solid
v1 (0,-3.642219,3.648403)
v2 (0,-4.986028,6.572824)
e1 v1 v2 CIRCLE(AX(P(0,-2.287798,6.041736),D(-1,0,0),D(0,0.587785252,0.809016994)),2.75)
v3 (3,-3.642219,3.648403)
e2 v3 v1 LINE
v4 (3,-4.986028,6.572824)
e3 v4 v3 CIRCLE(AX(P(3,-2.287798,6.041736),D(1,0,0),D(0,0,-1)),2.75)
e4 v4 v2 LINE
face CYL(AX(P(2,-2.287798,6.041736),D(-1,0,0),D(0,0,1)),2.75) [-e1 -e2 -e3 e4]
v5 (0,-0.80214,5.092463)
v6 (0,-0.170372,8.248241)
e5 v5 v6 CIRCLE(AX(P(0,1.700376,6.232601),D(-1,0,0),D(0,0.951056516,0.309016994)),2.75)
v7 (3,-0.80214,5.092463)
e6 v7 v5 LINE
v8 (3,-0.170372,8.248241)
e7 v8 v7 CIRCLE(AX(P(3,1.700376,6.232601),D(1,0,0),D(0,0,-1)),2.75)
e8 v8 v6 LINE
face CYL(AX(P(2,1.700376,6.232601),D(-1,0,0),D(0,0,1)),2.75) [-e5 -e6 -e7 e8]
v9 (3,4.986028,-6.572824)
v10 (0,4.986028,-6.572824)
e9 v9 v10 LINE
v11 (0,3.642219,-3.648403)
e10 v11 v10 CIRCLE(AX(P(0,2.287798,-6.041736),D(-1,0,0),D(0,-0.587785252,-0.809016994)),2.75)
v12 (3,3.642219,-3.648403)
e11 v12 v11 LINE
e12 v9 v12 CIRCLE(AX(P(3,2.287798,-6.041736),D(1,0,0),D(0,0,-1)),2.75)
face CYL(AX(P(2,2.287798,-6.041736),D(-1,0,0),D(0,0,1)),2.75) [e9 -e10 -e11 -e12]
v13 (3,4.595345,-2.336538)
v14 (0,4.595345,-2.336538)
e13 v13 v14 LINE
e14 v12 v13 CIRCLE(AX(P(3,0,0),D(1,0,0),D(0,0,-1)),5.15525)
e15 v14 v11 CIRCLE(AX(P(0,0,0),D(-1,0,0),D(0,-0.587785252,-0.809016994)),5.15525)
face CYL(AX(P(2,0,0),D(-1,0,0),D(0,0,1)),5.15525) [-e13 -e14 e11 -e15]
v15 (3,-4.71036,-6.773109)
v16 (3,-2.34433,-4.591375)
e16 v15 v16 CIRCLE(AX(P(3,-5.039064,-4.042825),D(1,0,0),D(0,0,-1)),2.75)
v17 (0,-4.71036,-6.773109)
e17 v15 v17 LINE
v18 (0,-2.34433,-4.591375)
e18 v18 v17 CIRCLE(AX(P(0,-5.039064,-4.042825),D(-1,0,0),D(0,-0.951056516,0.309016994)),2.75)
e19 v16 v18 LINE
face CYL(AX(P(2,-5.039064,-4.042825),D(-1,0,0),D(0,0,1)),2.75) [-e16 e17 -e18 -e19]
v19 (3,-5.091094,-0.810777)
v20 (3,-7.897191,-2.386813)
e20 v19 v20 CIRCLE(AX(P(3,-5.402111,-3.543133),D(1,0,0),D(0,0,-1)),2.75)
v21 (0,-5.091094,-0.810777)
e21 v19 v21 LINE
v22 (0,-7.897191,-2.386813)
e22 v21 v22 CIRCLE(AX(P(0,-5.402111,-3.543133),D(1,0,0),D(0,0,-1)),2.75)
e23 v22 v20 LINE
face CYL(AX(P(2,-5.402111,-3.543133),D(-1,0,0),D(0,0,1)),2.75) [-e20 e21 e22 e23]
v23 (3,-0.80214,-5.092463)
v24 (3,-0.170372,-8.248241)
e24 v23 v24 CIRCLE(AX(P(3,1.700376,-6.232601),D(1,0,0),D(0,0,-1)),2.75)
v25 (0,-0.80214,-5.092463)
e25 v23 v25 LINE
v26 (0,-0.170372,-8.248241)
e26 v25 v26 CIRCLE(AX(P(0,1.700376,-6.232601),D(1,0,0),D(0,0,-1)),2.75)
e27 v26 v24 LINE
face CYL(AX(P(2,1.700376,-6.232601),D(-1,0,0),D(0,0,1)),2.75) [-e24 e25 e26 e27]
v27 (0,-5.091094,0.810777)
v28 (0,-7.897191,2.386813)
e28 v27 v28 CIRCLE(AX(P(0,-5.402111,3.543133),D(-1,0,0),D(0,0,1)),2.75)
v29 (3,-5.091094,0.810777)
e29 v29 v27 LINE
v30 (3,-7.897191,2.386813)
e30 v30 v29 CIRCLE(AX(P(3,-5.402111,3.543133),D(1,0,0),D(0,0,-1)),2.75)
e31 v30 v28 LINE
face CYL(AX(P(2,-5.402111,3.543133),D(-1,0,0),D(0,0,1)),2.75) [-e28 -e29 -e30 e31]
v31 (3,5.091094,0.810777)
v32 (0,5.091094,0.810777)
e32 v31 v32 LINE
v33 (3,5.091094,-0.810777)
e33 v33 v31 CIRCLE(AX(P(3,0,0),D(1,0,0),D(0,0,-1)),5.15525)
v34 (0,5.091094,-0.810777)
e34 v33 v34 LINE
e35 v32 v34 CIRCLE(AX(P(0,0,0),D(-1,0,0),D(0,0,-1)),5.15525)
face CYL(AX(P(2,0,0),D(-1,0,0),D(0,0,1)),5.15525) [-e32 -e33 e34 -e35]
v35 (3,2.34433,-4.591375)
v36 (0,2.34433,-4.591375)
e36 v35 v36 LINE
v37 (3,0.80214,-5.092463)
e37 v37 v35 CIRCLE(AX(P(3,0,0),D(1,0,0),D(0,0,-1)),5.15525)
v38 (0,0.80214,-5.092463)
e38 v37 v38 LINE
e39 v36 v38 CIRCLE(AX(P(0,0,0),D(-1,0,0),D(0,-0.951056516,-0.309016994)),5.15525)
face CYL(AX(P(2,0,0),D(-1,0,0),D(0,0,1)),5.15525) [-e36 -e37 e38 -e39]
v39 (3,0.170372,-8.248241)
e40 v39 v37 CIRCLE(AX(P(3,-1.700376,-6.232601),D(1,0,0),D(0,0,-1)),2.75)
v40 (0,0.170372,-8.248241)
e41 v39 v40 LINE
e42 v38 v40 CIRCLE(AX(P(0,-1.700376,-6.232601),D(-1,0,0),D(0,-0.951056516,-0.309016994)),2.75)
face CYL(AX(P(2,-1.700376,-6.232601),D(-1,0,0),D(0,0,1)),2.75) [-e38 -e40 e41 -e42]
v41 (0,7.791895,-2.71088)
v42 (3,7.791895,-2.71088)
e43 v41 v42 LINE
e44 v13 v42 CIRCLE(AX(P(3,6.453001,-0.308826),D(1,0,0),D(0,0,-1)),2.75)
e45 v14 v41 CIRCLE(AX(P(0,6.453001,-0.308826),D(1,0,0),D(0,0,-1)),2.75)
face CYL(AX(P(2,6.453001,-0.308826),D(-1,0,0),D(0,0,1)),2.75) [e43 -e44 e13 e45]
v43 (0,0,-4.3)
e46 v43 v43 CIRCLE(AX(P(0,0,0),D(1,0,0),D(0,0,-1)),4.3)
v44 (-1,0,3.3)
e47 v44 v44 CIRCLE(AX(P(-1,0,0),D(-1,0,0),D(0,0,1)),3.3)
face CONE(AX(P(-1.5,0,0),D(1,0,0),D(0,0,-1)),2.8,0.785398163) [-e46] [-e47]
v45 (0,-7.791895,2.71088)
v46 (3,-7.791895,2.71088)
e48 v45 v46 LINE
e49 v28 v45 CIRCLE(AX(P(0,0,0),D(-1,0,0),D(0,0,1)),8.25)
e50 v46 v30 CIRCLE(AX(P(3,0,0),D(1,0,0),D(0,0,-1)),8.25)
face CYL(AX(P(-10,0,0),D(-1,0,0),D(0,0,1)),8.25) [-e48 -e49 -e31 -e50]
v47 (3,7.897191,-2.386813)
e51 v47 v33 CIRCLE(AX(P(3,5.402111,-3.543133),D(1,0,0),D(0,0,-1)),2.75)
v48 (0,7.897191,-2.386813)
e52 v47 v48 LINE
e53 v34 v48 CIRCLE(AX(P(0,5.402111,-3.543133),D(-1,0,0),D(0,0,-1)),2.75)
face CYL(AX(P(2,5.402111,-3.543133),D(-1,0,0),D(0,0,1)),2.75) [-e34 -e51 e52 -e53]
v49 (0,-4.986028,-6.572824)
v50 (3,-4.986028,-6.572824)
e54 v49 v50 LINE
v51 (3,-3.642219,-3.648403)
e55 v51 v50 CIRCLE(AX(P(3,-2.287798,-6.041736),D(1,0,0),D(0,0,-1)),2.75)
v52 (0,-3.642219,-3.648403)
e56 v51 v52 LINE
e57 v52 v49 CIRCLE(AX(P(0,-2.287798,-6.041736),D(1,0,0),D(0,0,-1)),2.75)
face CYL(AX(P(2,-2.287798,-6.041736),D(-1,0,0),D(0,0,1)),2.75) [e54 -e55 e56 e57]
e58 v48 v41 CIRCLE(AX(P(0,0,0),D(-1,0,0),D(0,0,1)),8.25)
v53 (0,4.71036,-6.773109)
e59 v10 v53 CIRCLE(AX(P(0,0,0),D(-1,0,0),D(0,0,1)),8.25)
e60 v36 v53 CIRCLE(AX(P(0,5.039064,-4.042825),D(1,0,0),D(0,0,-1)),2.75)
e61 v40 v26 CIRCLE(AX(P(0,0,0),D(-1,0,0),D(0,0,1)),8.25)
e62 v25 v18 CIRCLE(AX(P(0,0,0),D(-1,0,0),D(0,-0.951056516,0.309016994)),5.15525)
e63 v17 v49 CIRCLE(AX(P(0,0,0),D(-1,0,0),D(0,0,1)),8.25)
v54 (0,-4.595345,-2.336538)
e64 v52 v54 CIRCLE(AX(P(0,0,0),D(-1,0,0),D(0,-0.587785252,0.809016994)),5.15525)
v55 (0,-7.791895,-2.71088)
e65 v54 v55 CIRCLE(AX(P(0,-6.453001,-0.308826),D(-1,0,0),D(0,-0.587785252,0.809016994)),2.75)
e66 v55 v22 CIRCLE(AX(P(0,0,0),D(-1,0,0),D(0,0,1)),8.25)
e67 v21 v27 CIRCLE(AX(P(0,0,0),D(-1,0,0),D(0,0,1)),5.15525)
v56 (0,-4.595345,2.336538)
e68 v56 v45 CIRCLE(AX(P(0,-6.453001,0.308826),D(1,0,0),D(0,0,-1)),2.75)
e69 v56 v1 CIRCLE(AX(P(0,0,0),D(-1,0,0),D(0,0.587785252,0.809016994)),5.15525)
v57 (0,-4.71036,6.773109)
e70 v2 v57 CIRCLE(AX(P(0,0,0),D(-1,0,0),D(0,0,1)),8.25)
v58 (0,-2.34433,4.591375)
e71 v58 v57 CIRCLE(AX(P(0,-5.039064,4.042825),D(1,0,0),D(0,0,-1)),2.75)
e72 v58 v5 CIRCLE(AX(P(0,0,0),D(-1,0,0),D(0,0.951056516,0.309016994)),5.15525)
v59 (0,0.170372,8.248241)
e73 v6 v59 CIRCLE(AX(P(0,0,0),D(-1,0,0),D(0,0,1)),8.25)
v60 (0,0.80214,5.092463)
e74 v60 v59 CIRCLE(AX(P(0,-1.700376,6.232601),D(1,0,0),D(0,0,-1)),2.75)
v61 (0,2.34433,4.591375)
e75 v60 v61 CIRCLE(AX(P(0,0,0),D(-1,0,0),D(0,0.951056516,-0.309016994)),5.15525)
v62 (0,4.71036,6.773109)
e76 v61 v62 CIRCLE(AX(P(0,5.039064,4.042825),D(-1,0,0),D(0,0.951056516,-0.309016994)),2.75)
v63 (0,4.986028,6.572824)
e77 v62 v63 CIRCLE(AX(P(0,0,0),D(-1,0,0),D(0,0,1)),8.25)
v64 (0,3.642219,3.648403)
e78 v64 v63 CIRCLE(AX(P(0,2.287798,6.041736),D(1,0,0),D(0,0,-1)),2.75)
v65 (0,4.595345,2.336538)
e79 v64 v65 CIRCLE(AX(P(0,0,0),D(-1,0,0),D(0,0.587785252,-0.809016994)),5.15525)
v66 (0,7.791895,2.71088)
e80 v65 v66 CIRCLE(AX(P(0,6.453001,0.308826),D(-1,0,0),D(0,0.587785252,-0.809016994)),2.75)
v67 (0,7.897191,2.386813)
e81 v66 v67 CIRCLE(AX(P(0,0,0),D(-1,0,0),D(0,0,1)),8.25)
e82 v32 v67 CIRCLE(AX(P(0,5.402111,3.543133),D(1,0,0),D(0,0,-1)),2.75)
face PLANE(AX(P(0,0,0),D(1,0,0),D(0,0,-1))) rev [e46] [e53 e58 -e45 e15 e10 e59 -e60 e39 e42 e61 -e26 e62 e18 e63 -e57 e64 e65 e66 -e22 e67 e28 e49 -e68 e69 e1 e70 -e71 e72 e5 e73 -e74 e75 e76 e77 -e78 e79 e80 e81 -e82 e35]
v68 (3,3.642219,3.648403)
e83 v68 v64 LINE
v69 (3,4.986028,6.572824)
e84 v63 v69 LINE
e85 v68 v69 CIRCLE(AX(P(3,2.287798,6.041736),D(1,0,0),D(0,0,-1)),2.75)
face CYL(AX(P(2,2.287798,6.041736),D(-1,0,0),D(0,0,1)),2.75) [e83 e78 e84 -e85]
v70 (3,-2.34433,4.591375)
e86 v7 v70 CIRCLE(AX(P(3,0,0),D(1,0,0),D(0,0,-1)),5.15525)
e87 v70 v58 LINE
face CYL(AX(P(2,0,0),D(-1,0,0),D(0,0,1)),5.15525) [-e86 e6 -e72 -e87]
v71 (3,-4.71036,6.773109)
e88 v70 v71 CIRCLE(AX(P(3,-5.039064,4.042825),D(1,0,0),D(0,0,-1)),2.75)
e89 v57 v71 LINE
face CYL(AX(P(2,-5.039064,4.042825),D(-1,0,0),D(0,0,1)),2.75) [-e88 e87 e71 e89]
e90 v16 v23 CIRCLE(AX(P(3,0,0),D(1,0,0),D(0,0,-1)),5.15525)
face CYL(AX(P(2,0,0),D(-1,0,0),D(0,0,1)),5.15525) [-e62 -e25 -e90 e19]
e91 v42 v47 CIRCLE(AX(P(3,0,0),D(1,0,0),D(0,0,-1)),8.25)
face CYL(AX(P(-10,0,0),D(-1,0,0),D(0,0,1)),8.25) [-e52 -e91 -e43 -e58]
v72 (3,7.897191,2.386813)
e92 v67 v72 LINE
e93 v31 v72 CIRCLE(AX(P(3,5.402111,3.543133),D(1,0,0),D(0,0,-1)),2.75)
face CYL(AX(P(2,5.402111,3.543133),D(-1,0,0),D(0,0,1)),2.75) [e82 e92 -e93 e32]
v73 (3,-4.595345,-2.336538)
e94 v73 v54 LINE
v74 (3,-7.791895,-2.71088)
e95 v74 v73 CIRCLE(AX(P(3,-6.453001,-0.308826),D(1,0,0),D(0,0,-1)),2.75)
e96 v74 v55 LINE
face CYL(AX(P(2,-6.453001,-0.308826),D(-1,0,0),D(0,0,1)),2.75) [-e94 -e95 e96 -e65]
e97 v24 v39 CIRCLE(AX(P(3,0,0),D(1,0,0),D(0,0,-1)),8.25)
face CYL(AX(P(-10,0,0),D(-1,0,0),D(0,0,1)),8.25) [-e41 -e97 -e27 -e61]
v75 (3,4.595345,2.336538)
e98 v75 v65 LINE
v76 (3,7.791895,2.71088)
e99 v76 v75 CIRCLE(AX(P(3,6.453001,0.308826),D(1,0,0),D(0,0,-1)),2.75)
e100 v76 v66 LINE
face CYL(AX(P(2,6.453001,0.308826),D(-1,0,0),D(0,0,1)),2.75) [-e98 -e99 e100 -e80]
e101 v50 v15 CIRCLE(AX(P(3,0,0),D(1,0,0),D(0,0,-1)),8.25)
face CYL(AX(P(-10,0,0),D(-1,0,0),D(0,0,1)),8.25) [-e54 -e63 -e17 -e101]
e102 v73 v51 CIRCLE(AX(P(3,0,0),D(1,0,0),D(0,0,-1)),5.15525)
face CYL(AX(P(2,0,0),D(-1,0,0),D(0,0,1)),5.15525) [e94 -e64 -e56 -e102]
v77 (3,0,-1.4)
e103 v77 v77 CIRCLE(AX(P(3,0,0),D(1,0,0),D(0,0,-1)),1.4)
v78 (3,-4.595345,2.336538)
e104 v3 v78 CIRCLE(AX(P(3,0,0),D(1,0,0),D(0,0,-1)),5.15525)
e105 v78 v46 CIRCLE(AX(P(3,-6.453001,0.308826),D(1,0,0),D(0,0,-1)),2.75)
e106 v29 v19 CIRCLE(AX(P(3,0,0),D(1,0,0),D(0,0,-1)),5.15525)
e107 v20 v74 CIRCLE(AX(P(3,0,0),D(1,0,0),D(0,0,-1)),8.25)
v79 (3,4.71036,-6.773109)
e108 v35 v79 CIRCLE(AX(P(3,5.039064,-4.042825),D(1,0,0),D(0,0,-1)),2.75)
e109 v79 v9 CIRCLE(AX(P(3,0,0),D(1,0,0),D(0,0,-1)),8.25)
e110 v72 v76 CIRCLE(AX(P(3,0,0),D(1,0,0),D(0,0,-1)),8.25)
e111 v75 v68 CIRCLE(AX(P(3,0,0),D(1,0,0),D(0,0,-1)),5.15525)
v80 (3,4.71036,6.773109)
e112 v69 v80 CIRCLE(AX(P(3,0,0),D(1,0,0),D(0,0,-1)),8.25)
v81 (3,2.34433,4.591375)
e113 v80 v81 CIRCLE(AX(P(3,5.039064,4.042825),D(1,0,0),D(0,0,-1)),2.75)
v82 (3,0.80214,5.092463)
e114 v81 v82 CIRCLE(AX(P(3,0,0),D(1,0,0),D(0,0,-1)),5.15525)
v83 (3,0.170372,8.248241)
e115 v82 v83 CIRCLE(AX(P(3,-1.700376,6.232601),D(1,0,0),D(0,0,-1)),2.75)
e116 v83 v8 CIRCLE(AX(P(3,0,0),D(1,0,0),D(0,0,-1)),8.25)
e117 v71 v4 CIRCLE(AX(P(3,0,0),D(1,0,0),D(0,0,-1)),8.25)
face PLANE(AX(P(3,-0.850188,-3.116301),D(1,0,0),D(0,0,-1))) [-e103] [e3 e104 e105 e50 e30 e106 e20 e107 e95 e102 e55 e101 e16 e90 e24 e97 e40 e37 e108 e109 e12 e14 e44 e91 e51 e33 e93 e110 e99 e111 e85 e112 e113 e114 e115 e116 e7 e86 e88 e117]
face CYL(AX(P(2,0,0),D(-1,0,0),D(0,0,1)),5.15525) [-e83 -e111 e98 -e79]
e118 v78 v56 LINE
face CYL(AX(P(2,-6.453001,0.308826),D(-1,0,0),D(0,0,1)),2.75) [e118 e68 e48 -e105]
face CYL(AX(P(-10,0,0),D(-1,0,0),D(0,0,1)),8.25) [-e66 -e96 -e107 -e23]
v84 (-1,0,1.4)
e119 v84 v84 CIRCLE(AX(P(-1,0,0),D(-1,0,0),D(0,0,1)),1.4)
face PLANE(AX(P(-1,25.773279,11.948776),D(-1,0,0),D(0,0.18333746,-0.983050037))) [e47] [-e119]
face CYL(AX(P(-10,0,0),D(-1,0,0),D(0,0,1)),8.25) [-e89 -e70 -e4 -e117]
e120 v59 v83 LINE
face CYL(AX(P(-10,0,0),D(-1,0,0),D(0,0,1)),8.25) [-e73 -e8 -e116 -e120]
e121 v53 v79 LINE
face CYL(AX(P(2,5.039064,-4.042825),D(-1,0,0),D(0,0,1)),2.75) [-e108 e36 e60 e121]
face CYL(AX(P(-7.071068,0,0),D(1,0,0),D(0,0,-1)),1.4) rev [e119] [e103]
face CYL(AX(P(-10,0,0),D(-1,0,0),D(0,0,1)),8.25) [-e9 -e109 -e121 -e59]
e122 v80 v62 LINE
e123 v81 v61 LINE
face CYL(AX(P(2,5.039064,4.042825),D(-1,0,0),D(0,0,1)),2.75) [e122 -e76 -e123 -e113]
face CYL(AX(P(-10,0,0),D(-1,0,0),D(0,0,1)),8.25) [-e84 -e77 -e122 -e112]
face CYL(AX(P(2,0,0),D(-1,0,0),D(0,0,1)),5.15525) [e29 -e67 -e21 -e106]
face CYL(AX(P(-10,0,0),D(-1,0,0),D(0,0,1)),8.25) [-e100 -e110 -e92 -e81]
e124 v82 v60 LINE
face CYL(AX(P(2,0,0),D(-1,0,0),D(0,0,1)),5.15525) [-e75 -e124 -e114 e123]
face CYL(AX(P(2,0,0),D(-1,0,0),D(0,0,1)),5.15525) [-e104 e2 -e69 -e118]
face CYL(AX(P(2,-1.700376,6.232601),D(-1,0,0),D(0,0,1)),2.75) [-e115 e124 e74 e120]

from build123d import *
from build123d.topology import SkipClean

# Parameters (mm, degrees)
BASPROSKE_W         = 2
BASPROSKE_H         = 8.25
TOOTHCUT_DEPTH      = 12.837440602
TEETHCUTS_COUNT     = 10
TEETHCUTS_ANGLE     = 324
BORSKE_R            = 2.5
BORE_DEPTH          = 50.0000508
SKETCH1_R           = 2.5
SKETCH1_R_2         = 1.4
BOSS_EXTRUDE1_DEPTH = 2
SKETCH2_R           = 2.8
SKETCH2_R_2         = 1.6
BOSS_EXTRUDE2_DEPTH = 1
CHAMFER1_SIZE       = 1.5
SKETCH3_R           = 1.5
BOSS_EXTRUDE3_DEPTH = 1
SKETCH4_R           = 1.6
SKETCH4_R_2         = 1.4
BOSS_EXTRUDE4_DEPTH = 1
BOSS_EXTRUDE5_START = 1
SKETCH5_R           = 1.5
SKETCH5_R_2         = 1.4
BOSS_EXTRUDE5_DEPTH = 1


with BuildPart() as part:
    # BasProSke → Base-Revolve (revolve)
    with BuildSketch(Plane(origin=(0, 0, 0), x_dir=(1, 0, 0), z_dir=(0, 1, 0)), mode=Mode.PRIVATE) as base_revolve_sk:
        with Locations((1, 4.125)):
            Rectangle(BASPROSKE_W, BASPROSKE_H)
    revolve(base_revolve_sk.sketch.rotate(Axis((-10, 0, 0), (1, 0, 0)), 180), axis=Axis((-10, 0, 0), (1, 0, 0)))

    # TooCutSke → ToothCut (cut, through all)
    with BuildSketch(Plane(origin=(0, 0, 0), x_dir=(0, 0, -1), z_dir=(1, 0, 0))):
        with BuildLine():
            ThreePointArc((0.810777273, 5.091094458), (0, 5.15525), (-0.810777273, 5.091094458))
            ThreePointArc((-0.810777273, 5.091094458), (-1.154893166, 6.765492881), (-2.421785774, 7.913102983))
            ThreePointArc((-2.421785774, 7.913102983), (0, 8.2754), (2.421785774, 7.913102983))
            ThreePointArc((2.421785774, 7.913102983), (1.154893166, 6.765492881), (0.810777273, 5.091094458))
        make_face()
    toothcut = extrude(amount=TOOTHCUT_DEPTH, mode=Mode.SUBTRACT)

    # TeethCuts: ToothCut ×10 about axis
    teethcuts_axis = Axis((-10, 0, 0), (1, 0, 0))
    for i in range(1, TEETHCUTS_COUNT):
        add(toothcut.rotate(teethcuts_axis, i * TEETHCUTS_ANGLE / (TEETHCUTS_COUNT - 1)), mode=Mode.SUBTRACT)

    # BorSke → Bore (cut, symmetric)
    with BuildSketch(Plane(origin=(0, 0, 0), x_dir=(0, 0, -1), z_dir=(1, 0, 0))):
        with Locations(Location((0, 0, 0), (0, 0, 180))):
            Circle(BORSKE_R)
    extrude(amount=BORE_DEPTH, both=True, mode=Mode.SUBTRACT)

    # Sketch1 → Boss-Extrude1 (add)
    with BuildSketch(Plane(origin=(2, 0, 0), x_dir=(0, 0, -1), z_dir=(1, 0, 0))):
        Circle(SKETCH1_R)
        Circle(SKETCH1_R_2, mode=Mode.SUBTRACT)
    extrude(amount=-BOSS_EXTRUDE1_DEPTH)

    # Sketch2 → Boss-Extrude2 (add)
    with BuildSketch(Plane.ZY):
        with Locations(Location((0, 0, 0), (0, 0, 180))):
            Circle(SKETCH2_R)
        Circle(SKETCH2_R_2, mode=Mode.SUBTRACT)
    extrude(amount=BOSS_EXTRUDE2_DEPTH)

    # Chamfer1
    # the kernel refuses this chamfer: 1.5 mm, written as the material it adds along each edge
    with BuildSketch(Plane(origin=(0, 0, 0), x_dir=(0, 0, -1), z_dir=(0, 1, 0))) as chamfer1_piece_1_section:
        Polygon((2.8 + CHAMFER1_SIZE, 0), (2.8, CHAMFER1_SIZE), (2.8, 0), align=None)
    chamfer1_piece_1 = revolve(axis=Axis((0, 0, 0), (-1, 0, 0)), mode=Mode.PRIVATE)
    chamfer1_piece_1 = split(chamfer1_piece_1, bisect_by=Plane(origin=(-1, 0, 3.801160136), z_dir=(1, 0, 0)), keep=Keep.TOP, mode=Mode.PRIVATE)
    add(chamfer1_piece_1)

    # Sketch3 → Boss-Extrude3 (add)
    with SkipClean():  # the faces are left unmerged after this step: merging them gives an invalid solid
        with BuildSketch(Plane(origin=(2, 0, 0), x_dir=(0, 0, -1), z_dir=(1, 0, 0))):
            with BuildLine():
                ThreePointArc((8.248240616, 0.170372351), (6.772423309, 0.99612057), (5.092462515, 0.802139699))
                ThreePointArc((5.092462515, 0.802139699), (4.902934106, 1.59305986), (4.591374603, 2.344329716))
                ThreePointArc((4.591374603, 2.344329716), (6.06451053, 3.174852073), (6.773109188, 4.710360064))
                ThreePointArc((6.773109188, 4.710360064), (6.674390204, 4.849228331), (6.572824477, 4.986028319))
                ThreePointArc((6.572824477, 4.986028319), (4.893500569, 4.786609013), (3.648402832, 3.642219012))
                ThreePointArc((3.648402832, 3.642219012), (3.030179922, 4.17068486), (2.336537648, 4.59534486))
                ThreePointArc((2.336537648, 4.59534486), (3.040160855, 6.133139134), (2.710880259, 7.791895034))
                ThreePointArc((2.710880259, 7.791895034), (2.549390204, 7.846216259), (2.386812789, 7.897190938))
                ThreePointArc((2.386812789, 7.897190938), (1.145426936, 6.748775503), (0.810777273, 5.091094458))
                ThreePointArc((0.810777273, 5.091094458), (0, 5.15525), (-0.810777273, 5.091094458))
                ThreePointArc((-0.810777273, 5.091094458), (-1.145426936, 6.748775503), (-2.386812789, 7.897190938))
                ThreePointArc((-2.386812789, 7.897190938), (-2.549390204, 7.846216259), (-2.710880259, 7.791895034))
                ThreePointArc((-2.710880259, 7.791895034), (-3.040160855, 6.133139134), (-2.336537648, 4.59534486))
                ThreePointArc((-2.336537648, 4.59534486), (-3.030179922, 4.17068486), (-3.648402832, 3.642219012))
                ThreePointArc((-3.648402832, 3.642219012), (-4.893500569, 4.786609013), (-6.572824477, 4.986028319))
                ThreePointArc((-6.572824477, 4.986028319), (-6.674390204, 4.849228331), (-6.773109188, 4.710360064))
                ThreePointArc((-6.773109188, 4.710360064), (-6.06451053, 3.174852073), (-4.591374603, 2.344329716))
                ThreePointArc((-4.591374603, 2.344329716), (-4.902934106, 1.59305986), (-5.092462515, 0.802139699))
                ThreePointArc((-5.092462515, 0.802139699), (-6.772423309, 0.99612057), (-8.248240616, 0.170372351))
                ThreePointArc((-8.248240616, 0.170372351), (-8.25, 0), (-8.248240616, -0.170372351))
                ThreePointArc((-8.248240616, -0.170372351), (-6.772423309, -0.99612057), (-5.092462515, -0.802139699))
                ThreePointArc((-5.092462515, -0.802139699), (-4.902934106, -1.59305986), (-4.591374603, -2.344329716))
                ThreePointArc((-4.591374603, -2.344329716), (-6.06451053, -3.174852073), (-6.773109188, -4.710360064))
                ThreePointArc((-6.773109188, -4.710360064), (-6.674390204, -4.849228331), (-6.572824477, -4.986028319))
                ThreePointArc((-6.572824477, -4.986028319), (-4.893500569, -4.786609013), (-3.648402832, -3.642219012))
                ThreePointArc((-3.648402832, -3.642219012), (-3.030179922, -4.17068486), (-2.336537648, -4.59534486))
                ThreePointArc((-2.336537648, -4.59534486), (-3.040160855, -6.133139134), (-2.710880259, -7.791895034))
                ThreePointArc((-2.710880259, -7.791895034), (-2.549390204, -7.846216259), (-2.386812789, -7.897190938))
                ThreePointArc((-2.386812789, -7.897190938), (-1.145426936, -6.748775503), (-0.810777273, -5.091094458))
                ThreePointArc((-0.810777273, -5.091094458), (0, -5.15525), (0.810777273, -5.091094458))
                ThreePointArc((0.810777273, -5.091094458), (1.145426936, -6.748775503), (2.386812789, -7.897190938))
                ThreePointArc((2.386812789, -7.897190938), (2.549390204, -7.846216259), (2.710880259, -7.791895034))
                ThreePointArc((2.710880259, -7.791895034), (3.040160855, -6.133139134), (2.336537648, -4.59534486))
                ThreePointArc((2.336537648, -4.59534486), (3.030179922, -4.17068486), (3.648402832, -3.642219012))
                ThreePointArc((3.648402832, -3.642219012), (4.893500569, -4.786609013), (6.572824477, -4.986028319))
                ThreePointArc((6.572824477, -4.986028319), (6.674390204, -4.849228331), (6.773109188, -4.710360064))
                ThreePointArc((6.773109188, -4.710360064), (6.06451053, -3.174852073), (4.591374603, -2.344329716))
                ThreePointArc((4.591374603, -2.344329716), (4.902934106, -1.59305986), (5.092462515, -0.802139699))
                ThreePointArc((5.092462515, -0.802139699), (6.772423309, -0.99612057), (8.248240616, -0.170372351))
                ThreePointArc((8.248240616, -0.170372351), (8.25, 0), (8.248240616, 0.170372351))
            make_face()
            Circle(SKETCH3_R, mode=Mode.SUBTRACT)
        extrude(amount=BOSS_EXTRUDE3_DEPTH)

    # Sketch4 → Boss-Extrude4 (add)
    with SkipClean():  # the faces are left unmerged after this step: merging them gives an invalid solid
        with BuildSketch(Plane.ZY):
            Circle(SKETCH4_R)
            with Locations(Location((0, 0, 0), (0, 0, 180))):
                Circle(SKETCH4_R_2, mode=Mode.SUBTRACT)
        extrude(amount=BOSS_EXTRUDE4_DEPTH)

    # Sketch5 → Boss-Extrude5 (add)
    with SkipClean():  # the faces are left unmerged after this step: merging them gives an invalid solid
        with BuildSketch(Plane(origin=(2, 0, 0), x_dir=(0, 0, -1), z_dir=(1, 0, 0)).offset(BOSS_EXTRUDE5_START)):
            Circle(SKETCH5_R)
            Circle(SKETCH5_R_2, mode=Mode.SUBTRACT)
        extrude(amount=-BOSS_EXTRUDE5_DEPTH)


solid = part.part
